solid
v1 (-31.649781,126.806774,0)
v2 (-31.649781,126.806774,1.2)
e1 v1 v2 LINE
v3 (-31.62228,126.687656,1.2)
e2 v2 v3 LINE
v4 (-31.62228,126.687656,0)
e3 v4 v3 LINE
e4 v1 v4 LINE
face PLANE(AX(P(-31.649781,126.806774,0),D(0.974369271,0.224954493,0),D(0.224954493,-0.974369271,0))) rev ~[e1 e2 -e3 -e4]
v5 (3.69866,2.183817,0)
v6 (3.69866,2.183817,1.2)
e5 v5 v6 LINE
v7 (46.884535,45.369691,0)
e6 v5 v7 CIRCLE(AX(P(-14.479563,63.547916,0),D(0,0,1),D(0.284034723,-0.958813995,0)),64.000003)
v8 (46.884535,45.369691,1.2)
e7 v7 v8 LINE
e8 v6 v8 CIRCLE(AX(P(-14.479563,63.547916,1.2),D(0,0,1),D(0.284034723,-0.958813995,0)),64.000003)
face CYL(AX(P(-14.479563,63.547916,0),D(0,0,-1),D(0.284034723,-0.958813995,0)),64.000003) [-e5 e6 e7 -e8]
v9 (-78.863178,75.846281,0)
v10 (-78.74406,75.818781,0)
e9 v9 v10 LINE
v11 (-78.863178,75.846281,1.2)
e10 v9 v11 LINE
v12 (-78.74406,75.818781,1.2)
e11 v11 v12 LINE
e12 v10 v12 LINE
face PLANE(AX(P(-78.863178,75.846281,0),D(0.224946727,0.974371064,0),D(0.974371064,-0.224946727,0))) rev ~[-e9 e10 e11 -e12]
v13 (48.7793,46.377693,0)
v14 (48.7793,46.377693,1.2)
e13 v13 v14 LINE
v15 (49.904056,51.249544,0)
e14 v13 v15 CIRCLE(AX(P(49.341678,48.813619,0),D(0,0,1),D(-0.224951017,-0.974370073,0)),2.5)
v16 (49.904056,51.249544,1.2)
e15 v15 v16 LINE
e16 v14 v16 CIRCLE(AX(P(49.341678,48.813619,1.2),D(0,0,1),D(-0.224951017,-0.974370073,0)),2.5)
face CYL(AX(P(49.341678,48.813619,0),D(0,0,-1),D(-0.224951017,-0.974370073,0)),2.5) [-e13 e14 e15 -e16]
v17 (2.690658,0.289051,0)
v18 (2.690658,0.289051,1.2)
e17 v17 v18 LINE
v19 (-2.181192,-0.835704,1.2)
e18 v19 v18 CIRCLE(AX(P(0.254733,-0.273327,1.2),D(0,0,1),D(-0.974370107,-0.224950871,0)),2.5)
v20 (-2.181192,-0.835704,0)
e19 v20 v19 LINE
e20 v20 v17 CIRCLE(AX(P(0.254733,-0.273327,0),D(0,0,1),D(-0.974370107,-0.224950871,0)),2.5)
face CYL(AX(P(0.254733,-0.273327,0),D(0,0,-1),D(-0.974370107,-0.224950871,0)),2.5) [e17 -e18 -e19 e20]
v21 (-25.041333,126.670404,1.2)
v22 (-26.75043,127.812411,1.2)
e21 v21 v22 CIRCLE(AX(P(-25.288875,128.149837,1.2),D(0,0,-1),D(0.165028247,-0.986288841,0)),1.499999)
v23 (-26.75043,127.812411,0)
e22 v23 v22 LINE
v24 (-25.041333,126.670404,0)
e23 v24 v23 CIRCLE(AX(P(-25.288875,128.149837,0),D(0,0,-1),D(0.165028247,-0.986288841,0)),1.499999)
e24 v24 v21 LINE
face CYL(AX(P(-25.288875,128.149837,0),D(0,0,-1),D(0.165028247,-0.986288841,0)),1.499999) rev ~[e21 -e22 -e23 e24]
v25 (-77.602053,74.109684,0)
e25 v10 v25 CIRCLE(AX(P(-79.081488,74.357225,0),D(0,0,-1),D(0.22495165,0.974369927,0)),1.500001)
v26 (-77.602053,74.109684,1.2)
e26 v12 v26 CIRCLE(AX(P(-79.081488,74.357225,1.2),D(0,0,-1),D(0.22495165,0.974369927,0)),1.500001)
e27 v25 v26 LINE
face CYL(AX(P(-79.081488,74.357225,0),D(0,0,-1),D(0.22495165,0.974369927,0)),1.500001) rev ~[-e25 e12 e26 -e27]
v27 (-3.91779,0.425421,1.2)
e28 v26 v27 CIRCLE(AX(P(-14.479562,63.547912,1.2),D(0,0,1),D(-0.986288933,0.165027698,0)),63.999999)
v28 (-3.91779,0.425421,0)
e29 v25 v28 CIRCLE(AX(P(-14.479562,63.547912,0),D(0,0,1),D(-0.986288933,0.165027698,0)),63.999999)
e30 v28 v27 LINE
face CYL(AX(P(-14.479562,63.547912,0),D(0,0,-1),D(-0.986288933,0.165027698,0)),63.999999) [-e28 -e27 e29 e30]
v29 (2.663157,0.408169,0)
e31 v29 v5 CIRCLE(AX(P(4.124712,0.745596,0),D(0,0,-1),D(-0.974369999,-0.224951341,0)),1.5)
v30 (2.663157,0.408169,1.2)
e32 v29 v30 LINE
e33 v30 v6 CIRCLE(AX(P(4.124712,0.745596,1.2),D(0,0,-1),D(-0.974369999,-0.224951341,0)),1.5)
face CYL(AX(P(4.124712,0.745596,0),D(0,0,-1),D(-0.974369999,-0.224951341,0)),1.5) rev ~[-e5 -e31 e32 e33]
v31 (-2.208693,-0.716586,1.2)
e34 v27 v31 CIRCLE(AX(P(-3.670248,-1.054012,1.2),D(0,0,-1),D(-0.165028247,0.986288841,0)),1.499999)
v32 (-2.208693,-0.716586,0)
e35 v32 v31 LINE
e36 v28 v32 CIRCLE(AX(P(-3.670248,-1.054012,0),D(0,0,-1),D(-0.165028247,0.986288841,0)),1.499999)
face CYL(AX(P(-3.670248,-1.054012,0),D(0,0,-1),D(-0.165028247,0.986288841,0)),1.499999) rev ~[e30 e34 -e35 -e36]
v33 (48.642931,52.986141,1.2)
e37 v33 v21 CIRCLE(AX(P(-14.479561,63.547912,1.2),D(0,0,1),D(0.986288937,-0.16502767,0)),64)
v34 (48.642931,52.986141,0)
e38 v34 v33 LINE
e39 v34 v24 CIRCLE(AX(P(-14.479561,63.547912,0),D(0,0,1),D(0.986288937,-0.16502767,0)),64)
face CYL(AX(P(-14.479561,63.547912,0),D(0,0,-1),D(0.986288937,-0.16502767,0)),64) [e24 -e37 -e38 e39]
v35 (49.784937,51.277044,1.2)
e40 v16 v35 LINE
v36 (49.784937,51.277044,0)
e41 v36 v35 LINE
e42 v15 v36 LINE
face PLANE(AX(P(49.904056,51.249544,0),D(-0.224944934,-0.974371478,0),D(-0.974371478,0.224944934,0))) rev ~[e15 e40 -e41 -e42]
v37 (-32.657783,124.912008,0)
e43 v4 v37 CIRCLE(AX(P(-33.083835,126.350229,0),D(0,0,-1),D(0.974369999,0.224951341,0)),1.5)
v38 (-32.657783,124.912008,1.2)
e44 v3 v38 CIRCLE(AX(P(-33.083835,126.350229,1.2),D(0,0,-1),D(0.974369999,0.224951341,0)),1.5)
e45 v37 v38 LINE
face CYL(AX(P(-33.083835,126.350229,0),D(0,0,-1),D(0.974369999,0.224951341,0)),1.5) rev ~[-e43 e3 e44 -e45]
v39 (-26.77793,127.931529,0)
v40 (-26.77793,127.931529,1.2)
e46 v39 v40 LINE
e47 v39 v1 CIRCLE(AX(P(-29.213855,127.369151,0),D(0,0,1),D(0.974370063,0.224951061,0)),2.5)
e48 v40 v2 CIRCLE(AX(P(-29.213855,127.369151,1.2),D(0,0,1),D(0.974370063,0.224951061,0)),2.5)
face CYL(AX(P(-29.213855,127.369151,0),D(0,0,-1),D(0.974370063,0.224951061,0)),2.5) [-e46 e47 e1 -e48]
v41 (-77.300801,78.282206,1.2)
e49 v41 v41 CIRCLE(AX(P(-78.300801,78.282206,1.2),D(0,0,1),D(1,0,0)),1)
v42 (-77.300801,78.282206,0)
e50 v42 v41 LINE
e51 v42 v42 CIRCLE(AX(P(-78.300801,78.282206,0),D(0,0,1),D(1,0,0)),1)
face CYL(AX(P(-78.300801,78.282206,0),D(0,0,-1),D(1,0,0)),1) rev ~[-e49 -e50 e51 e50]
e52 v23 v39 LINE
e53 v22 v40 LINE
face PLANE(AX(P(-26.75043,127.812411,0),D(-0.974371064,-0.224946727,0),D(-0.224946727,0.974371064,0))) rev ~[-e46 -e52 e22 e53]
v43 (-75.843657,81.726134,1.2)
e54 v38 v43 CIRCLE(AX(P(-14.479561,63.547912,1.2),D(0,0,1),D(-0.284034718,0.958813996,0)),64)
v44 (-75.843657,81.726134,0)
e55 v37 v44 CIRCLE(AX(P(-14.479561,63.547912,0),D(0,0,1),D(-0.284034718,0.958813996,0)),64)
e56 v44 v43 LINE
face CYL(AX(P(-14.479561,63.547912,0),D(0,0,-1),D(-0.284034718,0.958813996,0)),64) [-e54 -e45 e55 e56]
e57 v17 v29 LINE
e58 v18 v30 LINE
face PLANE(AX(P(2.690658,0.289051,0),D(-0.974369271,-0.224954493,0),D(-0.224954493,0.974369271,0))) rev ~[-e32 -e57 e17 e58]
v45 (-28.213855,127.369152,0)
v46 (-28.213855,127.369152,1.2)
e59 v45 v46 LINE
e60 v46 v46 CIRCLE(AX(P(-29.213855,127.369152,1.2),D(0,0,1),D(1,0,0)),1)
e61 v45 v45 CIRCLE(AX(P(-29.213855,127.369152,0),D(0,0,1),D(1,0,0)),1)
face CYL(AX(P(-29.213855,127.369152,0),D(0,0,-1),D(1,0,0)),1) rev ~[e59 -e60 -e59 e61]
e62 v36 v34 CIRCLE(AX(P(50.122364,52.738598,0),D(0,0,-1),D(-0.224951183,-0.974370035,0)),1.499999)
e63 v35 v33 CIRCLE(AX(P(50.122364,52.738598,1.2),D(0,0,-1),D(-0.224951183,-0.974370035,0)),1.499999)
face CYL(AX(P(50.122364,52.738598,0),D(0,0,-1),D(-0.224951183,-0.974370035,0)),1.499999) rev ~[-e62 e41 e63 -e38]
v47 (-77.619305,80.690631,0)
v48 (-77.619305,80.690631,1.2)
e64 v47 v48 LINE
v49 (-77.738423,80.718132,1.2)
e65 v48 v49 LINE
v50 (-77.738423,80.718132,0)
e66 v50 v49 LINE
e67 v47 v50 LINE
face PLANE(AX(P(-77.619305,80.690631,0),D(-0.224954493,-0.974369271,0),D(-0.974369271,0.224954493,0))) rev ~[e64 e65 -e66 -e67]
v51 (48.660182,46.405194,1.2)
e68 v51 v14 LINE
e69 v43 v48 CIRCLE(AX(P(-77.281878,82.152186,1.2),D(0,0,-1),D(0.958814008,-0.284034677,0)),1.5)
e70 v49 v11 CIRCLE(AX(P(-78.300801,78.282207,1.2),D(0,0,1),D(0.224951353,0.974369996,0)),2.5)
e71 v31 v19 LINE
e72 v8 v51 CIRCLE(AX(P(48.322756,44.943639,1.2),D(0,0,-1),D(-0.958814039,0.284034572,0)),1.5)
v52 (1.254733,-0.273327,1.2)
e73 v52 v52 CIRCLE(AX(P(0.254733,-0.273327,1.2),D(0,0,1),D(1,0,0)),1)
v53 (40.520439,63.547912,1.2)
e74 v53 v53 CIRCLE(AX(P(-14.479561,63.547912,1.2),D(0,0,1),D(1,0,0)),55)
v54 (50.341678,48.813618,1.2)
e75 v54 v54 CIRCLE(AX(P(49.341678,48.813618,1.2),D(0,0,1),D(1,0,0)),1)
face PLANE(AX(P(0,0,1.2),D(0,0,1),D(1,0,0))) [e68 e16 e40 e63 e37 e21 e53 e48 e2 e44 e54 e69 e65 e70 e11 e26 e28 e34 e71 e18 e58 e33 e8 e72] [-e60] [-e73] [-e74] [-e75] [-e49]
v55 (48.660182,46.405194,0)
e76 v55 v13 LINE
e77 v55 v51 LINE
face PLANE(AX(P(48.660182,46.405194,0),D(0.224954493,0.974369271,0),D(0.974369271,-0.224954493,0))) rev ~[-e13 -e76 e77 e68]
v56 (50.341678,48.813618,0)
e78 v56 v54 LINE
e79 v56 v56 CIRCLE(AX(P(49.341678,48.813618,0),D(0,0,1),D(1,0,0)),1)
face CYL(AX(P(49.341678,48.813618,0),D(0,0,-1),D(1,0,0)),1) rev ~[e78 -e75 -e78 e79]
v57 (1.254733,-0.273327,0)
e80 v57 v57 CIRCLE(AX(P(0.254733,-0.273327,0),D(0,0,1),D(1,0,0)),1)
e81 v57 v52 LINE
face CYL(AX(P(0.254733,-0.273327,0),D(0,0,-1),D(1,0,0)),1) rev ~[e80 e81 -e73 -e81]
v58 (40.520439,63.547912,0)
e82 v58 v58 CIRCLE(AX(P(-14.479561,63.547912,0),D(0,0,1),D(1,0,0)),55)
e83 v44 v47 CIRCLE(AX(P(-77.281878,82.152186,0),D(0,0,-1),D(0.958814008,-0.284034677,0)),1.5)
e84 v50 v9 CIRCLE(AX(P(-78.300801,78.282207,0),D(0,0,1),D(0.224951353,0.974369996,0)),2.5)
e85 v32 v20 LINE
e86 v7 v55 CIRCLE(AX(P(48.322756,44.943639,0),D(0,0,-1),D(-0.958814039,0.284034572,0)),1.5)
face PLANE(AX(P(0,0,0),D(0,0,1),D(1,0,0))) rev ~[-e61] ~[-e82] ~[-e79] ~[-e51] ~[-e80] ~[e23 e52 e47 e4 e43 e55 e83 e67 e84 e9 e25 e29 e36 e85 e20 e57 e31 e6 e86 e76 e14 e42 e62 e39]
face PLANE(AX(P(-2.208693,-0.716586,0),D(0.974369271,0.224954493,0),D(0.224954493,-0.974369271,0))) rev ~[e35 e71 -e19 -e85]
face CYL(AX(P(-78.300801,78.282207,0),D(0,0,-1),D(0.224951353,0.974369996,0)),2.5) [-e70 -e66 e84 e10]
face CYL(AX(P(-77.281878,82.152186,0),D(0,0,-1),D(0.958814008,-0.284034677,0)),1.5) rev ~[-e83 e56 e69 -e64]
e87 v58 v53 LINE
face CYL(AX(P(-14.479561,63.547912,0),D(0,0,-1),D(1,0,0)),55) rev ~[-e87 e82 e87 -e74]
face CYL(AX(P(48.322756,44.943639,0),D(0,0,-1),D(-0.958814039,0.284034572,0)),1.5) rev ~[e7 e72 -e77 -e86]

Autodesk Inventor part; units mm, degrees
ref_plane "YZ Plane" through (0, 0, 0) normal (1, 0, 0) x (0, 1, 0)
ref_plane "XZ Plane" through (0, 0, 0) normal (0, 1, 0) x (-1, 0, 0)
ref_plane "作業平面1" through (0, 0, 0) normal (0, 0, 1) x (1, 0, 0)
sketch "スケッチ1" plane through (0, 0, 0) normal (0, 0, 1) x (1, 0, 0)
  circle A0 centre (-14.624772, 63.539385) radius 64
  arc A1 (-81.893775, 52.547912) -> (-80.479561, 53.962126) centre (-81.186668, 53.255019) ccw
  line L0 (-81.893775, 52.547912) -> (-83.065348, 52.547912)
  arc A2 (-84.479561, 53.962126) -> (-83.065348, 52.547912) centre (-83.772455, 53.255019) ccw
  line L1 (-84.479561, 53.962126) -> (-84.479561, 73.133699)
  arc A3 (-83.065348, 74.547912) -> (-84.479561, 73.133699) centre (-83.772455, 73.840806) ccw
  line L2 (-83.065348, 74.547912) -> (-81.893775, 74.547912)
  arc A4 (-80.479561, 73.133699) -> (-81.893775, 74.547912) centre (-81.186668, 73.840806) ccw
  line L3 (-80.479561, 73.133699) -> (-80.479561, 53.962126)
  arc A5 (-3.479561, 132.133699) -> (-4.893775, 133.547912) centre (-4.186668, 132.840806) ccw
  line L4 (-3.479561, 132.133699) -> (-3.479561, 130.962126)
  arc A6 (-4.893775, 129.547912) -> (-3.479561, 130.962126) centre (-4.186668, 130.255019) ccw
  line L5 (-4.893775, 129.547912) -> (-24.065348, 129.547912)
  arc A7 (-25.479561, 130.962126) -> (-24.065348, 129.547912) centre (-24.772455, 130.255019) ccw
  line L6 (-25.479561, 130.962126) -> (-25.479561, 132.133699)
  arc A8 (-24.065348, 133.547912) -> (-25.479561, 132.133699) centre (-24.772455, 132.840806) ccw
  line L7 (-24.065348, 133.547912) -> (-4.893775, 133.547912)
  arc A9 (54.106225, 52.547912) -> (55.520439, 53.962126) centre (54.813332, 53.255019) ccw
  line L8 (54.106225, 52.547912) -> (52.934652, 52.547912)
  arc A10 (51.520439, 53.962126) -> (52.934652, 52.547912) centre (52.227545, 53.255019) ccw
  line L9 (51.520439, 53.962126) -> (51.520439, 73.133699)
  arc A11 (52.934652, 74.547912) -> (51.520439, 73.133699) centre (52.227545, 73.840806) ccw
  line L10 (52.934652, 74.547912) -> (54.106225, 74.547912)
  arc A12 (55.520439, 73.133699) -> (54.106225, 74.547912) centre (54.813332, 73.840806) ccw
  line L11 (55.520439, 73.133699) -> (55.520439, 53.962126)
  arc A13 (-25.479561, -5.037874) -> (-24.065348, -6.452088) centre (-24.772455, -5.744981) ccw
  line L12 (-25.479561, -5.037874) -> (-25.479561, -3.866301)
  arc A14 (-24.065348, -2.452088) -> (-25.479561, -3.866301) centre (-24.772455, -3.159194) ccw
  line L13 (-24.065348, -2.452088) -> (-4.893775, -2.452088)
  arc A15 (-3.479561, -3.866301) -> (-4.893775, -2.452088) centre (-4.186668, -3.159194) ccw
  line L14 (-3.479561, -3.866301) -> (-3.479561, -5.037874)
  arc A16 (-4.893775, -6.452088) -> (-3.479561, -5.037874) centre (-4.186668, -5.744981) ccw
  line L15 (-4.893775, -6.452088) -> (-24.065348, -6.452088)
  arc A17 (-90.380937, 104.093949) -> (-92.776199, 103.718007) centre (-91.441598, 103.033289) ccw
  arc A18 (-92.776199, 103.718007) -> (-98.248191, 90.50745) centre (-14.479561, 63.547912) ccw
  arc A19 (-98.248191, 90.50745) -> (-96.820317, 88.547912) centre (-96.820317, 90.047912) ccw
  line L16 (-96.820317, 88.547912) -> (-88.479561, 88.547912)
  arc A20 (-86.479561, 86.547912) -> (-88.479561, 88.547912) centre (-88.479561, 86.547912) ccw
  line L17 (-86.479561, 86.547912) -> (-86.479561, 40.547912)
  arc A21 (-88.479561, 38.547912) -> (-86.479561, 40.547912) centre (-88.479561, 40.547912) ccw
  line L18 (-88.479561, 38.547912) -> (-96.820317, 38.547912)
  arc A22 (-96.820317, 38.547912) -> (-98.248191, 36.588375) centre (-96.820317, 37.047912) ccw
  arc A23 (-98.248191, 36.588375) -> (-41.439099, -20.220717) centre (-14.479561, 63.547912) ccw
  arc A24 (-41.439099, -20.220717) -> (-39.479561, -18.792843) centre (-40.979561, -18.792843) ccw
  line L19 (-39.479561, -18.792843) -> (-39.479561, -10.452088)
  arc A25 (-37.479561, -8.452088) -> (-39.479561, -10.452088) centre (-37.479561, -10.452088) ccw
  line L20 (-37.479561, -8.452088) -> (8.520439, -8.452088)
  arc A26 (10.520439, -10.452088) -> (8.520439, -8.452088) centre (8.520439, -10.452088) ccw
  line L21 (10.520439, -10.452088) -> (10.520439, -18.792843)
  arc A27 (10.520439, -18.792843) -> (12.479976, -20.220717) centre (12.020439, -18.792843) ccw
  arc A28 (12.479976, -20.220717) -> (25.690533, -14.748726) centre (-14.479561, 63.547912) ccw
  arc A29 (25.690533, -14.748726) -> (26.066476, -12.353464) centre (25.005815, -13.414124) ccw
  line L22 (26.066476, -12.353464) -> (20.079693, -6.366681)
  arc A30 (20.079693, -2.124041) -> (20.079693, -6.366681) centre (22.201014, -4.245361) ccw
  line L23 (20.079693, -2.124041) -> (22.554567, 0.350833)
  arc A31 (55.435032, 28.988658) -> (51.192392, 28.988658) centre (53.313712, 26.867337) ccw
  line L24 (55.435032, 28.988658) -> (61.421815, 23.001875)
  arc A32 (61.421815, 23.001875) -> (63.817077, 23.377818) centre (62.482475, 24.062536) ccw
  arc A33 (63.817077, 23.377818) -> (69.289068, 36.588375) centre (-14.479561, 63.547912) ccw
  arc A34 (69.289068, 36.588375) -> (67.861194, 38.547912) centre (67.861194, 37.047912) ccw
  line L25 (67.861194, 38.547912) -> (59.520439, 38.547912)
  arc A35 (57.520439, 40.547912) -> (59.520439, 38.547912) centre (59.520439, 40.547912) ccw
  line L26 (57.520439, 40.547912) -> (57.520439, 86.547912)
  arc A36 (59.520439, 88.547912) -> (57.520439, 86.547912) centre (59.520439, 86.547912) ccw
  line L27 (59.520439, 88.547912) -> (67.861194, 88.547912)
  arc A37 (67.861194, 88.547912) -> (69.289068, 90.50745) centre (67.861194, 90.047912) ccw
  arc A38 (69.289068, 90.50745) -> (12.479976, 147.316542) centre (-14.479561, 63.547912) ccw
  arc A39 (12.479976, 147.316542) -> (10.520439, 145.888668) centre (12.020439, 145.888668) ccw
  line L28 (10.520439, 145.888668) -> (10.520439, 137.547912)
  arc A40 (8.520439, 135.547912) -> (10.520439, 137.547912) centre (8.520439, 137.547912) ccw
  line L29 (8.520439, 135.547912) -> (-37.479561, 135.547912)
  arc A41 (-39.479561, 137.547912) -> (-37.479561, 135.547912) centre (-37.479561, 137.547912) ccw
  line L30 (-39.479561, 137.547912) -> (-39.479561, 145.888668)
  arc A42 (-39.479561, 145.888668) -> (-41.439099, 147.316542) centre (-40.979561, 145.888668) ccw
  arc A43 (-41.439099, 147.316542) -> (-54.649656, 141.84455) centre (-14.479561, 63.547912) ccw
  arc A44 (-54.649656, 141.84455) -> (-55.025598, 139.449288) centre (-53.964938, 140.509949) ccw
  line L31 (-55.025598, 139.449288) -> (-49.038816, 133.462506)
  arc A45 (-49.038816, 129.219865) -> (-49.038816, 133.462506) centre (-51.160136, 131.341186) ccw
  line L32 (-54.342117, 123.916565) -> (-74.848214, 103.410468)
  arc A46 (-84.394155, 98.107167) -> (-80.151514, 98.107167) centre (-82.272835, 100.228487) ccw
  line L33 (-84.394155, 98.107167) -> (-90.380937, 104.093949)
  arc A47 (-32.657783, 124.912008) -> (-31.62228, 126.687656) centre (-33.083835, 126.350229) ccw
  line L34 (-31.62228, 126.687656) -> (-31.649781, 126.806774)
  arc A48 (-26.77793, 127.931529) -> (-31.649781, 126.806774) centre (-29.213855, 127.369152) ccw
  line L35 (-26.77793, 127.931529) -> (-26.75043, 127.812411)
  arc A49 (-26.75043, 127.812411) -> (-25.041333, 126.670404) centre (-25.288875, 128.149838) ccw
  arc A50 (48.642931, 52.986141) -> (-25.041333, 126.670404) centre (-14.479561, 63.547912) ccw
  arc A51 (48.642931, 52.986141) -> (49.784937, 51.277044) centre (50.122364, 52.738599) ccw
  line L36 (49.784937, 51.277044) -> (49.904056, 51.249544)
  arc A52 (48.7793, 46.377693) -> (49.904056, 51.249544) centre (49.341678, 48.813618) ccw
  line L37 (48.7793, 46.377693) -> (48.660182, 46.405194)
  arc A53 (48.660182, 46.405194) -> (46.884535, 45.369691) centre (48.322756, 44.943639) ccw
  arc A54 (3.69866, 2.183817) -> (46.884535, 45.369691) centre (-14.479561, 63.547912) ccw
  arc A55 (3.69866, 2.183817) -> (2.663157, 0.408169) centre (4.124712, 0.745596) ccw
  line L38 (2.663157, 0.408169) -> (2.690658, 0.289051)
  arc A56 (-2.181192, -0.835704) -> (2.690658, 0.289051) centre (0.254733, -0.273327) ccw
  line L39 (-2.181192, -0.835704) -> (-2.208693, -0.716586)
  arc A57 (-2.208693, -0.716586) -> (-3.91779, 0.425421) centre (-3.670248, -1.054013) ccw
  arc A58 (-77.602053, 74.109684) -> (-3.91779, 0.425421) centre (-14.479561, 63.547912) ccw
  arc A59 (-77.602053, 74.109684) -> (-78.74406, 75.818781) centre (-79.081487, 74.357226) ccw
  line L40 (-78.74406, 75.818781) -> (-78.863178, 75.846281)
  arc A60 (-77.738423, 80.718132) -> (-78.863178, 75.846281) centre (-78.300801, 78.282206) ccw
  line L41 (-77.738423, 80.718132) -> (-77.619305, 80.690631)
  arc A61 (-77.619305, 80.690631) -> (-75.843657, 81.726134) centre (-77.281878, 82.152186) ccw
  arc A62 (-32.657783, 124.912008) -> (-75.843657, 81.726134) centre (-14.479561, 63.547912) ccw
  circle A63 centre (65.069166, 92.047912) radius 2.5
  circle A64 centre (-42.979561, -16.000815) radius 2.5
  circle A65 centre (14.020439, 143.09664) radius 2.5
  circle A66 centre (-94.028289, 35.047912) radius 2.5
  circle A67 centre (49.341678, 48.813618) radius 1
  circle A68 centre (0.254733, -0.273327) radius 1
  circle A69 centre (-78.300801, 78.282206) radius 1
  circle A70 centre (-29.213855, 127.369152) radius 1
  circle A71 centre (-14.479561, 63.547912) radius 55
  circle A72 centre (19.135053, 141.074087) radius 2
  circle A73 centre (63.046613, 97.162527) radius 2
  circle A74 centre (2.020439, 127.968406) radius 2
  circle A75 centre (49.940932, 80.047912) radius 2
  line L42 (-74.848214, 103.410468) -> (-72.019786, 100.582041)
  line L43 (-71.31268, 99.874934) -> (-74.141107, 97.046507)
  line L44 (-74.848214, 97.753614) -> (-77.676641, 100.582041)
  line L45 (-49.038816, 129.219865) -> (-51.51369, 126.744992)
  line L46 (-51.51369, 126.744992) -> (-48.685263, 123.916565)
  line L47 (-47.978156, 123.209458) -> (-50.806583, 120.381031)
  line L48 (-51.51369, 121.088137) -> (-54.342117, 123.916565)
  arc A76 (-47.978156, 123.209458) -> (-48.685263, 123.916565) centre (-48.331709, 123.563011) ccw
  arc A77 (-51.51369, 121.088137) -> (-50.806583, 120.381031) centre (-51.160136, 120.734584) ccw
  arc A78 (-71.31268, 99.874934) -> (-72.019786, 100.582041) centre (-71.666233, 100.228487) ccw
  arc A79 (-74.848214, 97.753614) -> (-74.141107, 97.046507) centre (-74.49466, 97.40006) ccw
  line L49 (-77.676641, 100.582041) -> (-80.151514, 98.107167)
  line L50 (22.554567, 0.350833) -> (19.72614, 3.17926)
  arc A80 (19.019033, 3.886367) -> (19.72614, 3.17926) centre (19.372587, 3.532814) ccw
  line L51 (19.019033, 3.886367) -> (21.84746, 6.714794)
  arc A81 (22.554567, 6.007687) -> (21.84746, 6.714794) centre (22.201014, 6.361241) ccw
  line L52 (22.554567, 6.007687) -> (25.382994, 3.17926)
  line L53 (25.382994, 3.17926) -> (45.889091, 23.685357)
  line L54 (45.889091, 23.685357) -> (43.060664, 26.513784)
  arc A82 (42.353557, 27.220891) -> (43.060664, 26.513784) centre (42.70711, 26.867337) ccw
  line L55 (42.353557, 27.220891) -> (45.181984, 30.049318)
  arc A83 (45.889091, 29.342211) -> (45.181984, 30.049318) centre (45.535537, 29.695765) ccw
  line L56 (45.889091, 29.342211) -> (48.717518, 26.513784)
  line L57 (48.717518, 26.513784) -> (51.192392, 28.988658)
  point P0 (0, 0)
  dimension "d0" = 2
  dimension "d3" = 110
sketch "スケッチ1 outline for 押し出し1" plane through (0, 0, 0) normal (0, 0, 1) x (1, 0, 0)
  line L0 (-78.863178, 75.846281) -> (-78.74406, 75.818781)
  arc A0 (-77.738423, 80.718132) -> (-78.863178, 75.846281) centre (-78.300801, 78.282206) ccw
  arc A1 (-78.74406, 75.818781) -> (-77.602053, 74.109684) centre (-79.081487, 74.357226) cw
  line L1 (-77.619305, 80.690631) -> (-77.738423, 80.718132)
  arc A2 (-77.602053, 74.109684) -> (-3.91779, 0.425421) centre (-14.479561, 63.547912) ccw
  arc A3 (-75.843657, 81.726134) -> (-77.619305, 80.690631) centre (-77.281878, 82.152186) cw
  arc A4 (-3.91779, 0.425421) -> (-2.208693, -0.716586) centre (-3.670248, -1.054013) cw
  arc A5 (-32.657783, 124.912008) -> (-75.843657, 81.726134) centre (-14.479561, 63.547912) ccw
  line L2 (-2.208693, -0.716586) -> (-2.181192, -0.835704)
  arc A6 (-31.62228, 126.687656) -> (-32.657783, 124.912008) centre (-33.083835, 126.350229) cw
  arc A7 (-2.181192, -0.835704) -> (2.690658, 0.289051) centre (0.254733, -0.273327) ccw
  line L3 (-31.649781, 126.806774) -> (-31.62228, 126.687656)
  line L4 (2.690658, 0.289051) -> (2.663157, 0.408169)
  arc A8 (-26.77793, 127.931529) -> (-31.649781, 126.806774) centre (-29.213855, 127.369152) ccw
  arc A9 (2.663157, 0.408169) -> (3.69866, 2.183817) centre (4.124712, 0.745596) cw
  line L5 (-26.75043, 127.812411) -> (-26.77793, 127.931529)
  arc A10 (3.69866, 2.183817) -> (46.884535, 45.369691) centre (-14.479561, 63.547912) ccw
  arc A11 (-25.041333, 126.670404) -> (-26.75043, 127.812411) centre (-25.288875, 128.149838) cw
  arc A12 (46.884535, 45.369691) -> (48.660182, 46.405194) centre (48.322756, 44.943639) cw
  arc A13 (48.642931, 52.986141) -> (-25.041333, 126.670404) centre (-14.479561, 63.547912) ccw
  line L6 (48.660182, 46.405194) -> (48.7793, 46.377693)
  arc A14 (49.784937, 51.277044) -> (48.642931, 52.986141) centre (50.122364, 52.738599) cw
  arc A15 (48.7793, 46.377693) -> (49.904056, 51.249544) centre (49.341678, 48.813618) ccw
  line L7 (49.904056, 51.249544) -> (49.784937, 51.277044)
  circle A16 centre (0.254733, -0.273327) radius 1
  circle A17 centre (-14.479561, 63.547912) radius 55
  circle A18 centre (49.341678, 48.813618) radius 1
  circle A19 centre (-78.300801, 78.282206) radius 1
  circle A20 centre (-29.213855, 127.369152) radius 1
extrude "押し出し1" add sketch "スケッチ1 outline for 押し出し1" along normal blind 1.2
properties part number "LineSensor"
